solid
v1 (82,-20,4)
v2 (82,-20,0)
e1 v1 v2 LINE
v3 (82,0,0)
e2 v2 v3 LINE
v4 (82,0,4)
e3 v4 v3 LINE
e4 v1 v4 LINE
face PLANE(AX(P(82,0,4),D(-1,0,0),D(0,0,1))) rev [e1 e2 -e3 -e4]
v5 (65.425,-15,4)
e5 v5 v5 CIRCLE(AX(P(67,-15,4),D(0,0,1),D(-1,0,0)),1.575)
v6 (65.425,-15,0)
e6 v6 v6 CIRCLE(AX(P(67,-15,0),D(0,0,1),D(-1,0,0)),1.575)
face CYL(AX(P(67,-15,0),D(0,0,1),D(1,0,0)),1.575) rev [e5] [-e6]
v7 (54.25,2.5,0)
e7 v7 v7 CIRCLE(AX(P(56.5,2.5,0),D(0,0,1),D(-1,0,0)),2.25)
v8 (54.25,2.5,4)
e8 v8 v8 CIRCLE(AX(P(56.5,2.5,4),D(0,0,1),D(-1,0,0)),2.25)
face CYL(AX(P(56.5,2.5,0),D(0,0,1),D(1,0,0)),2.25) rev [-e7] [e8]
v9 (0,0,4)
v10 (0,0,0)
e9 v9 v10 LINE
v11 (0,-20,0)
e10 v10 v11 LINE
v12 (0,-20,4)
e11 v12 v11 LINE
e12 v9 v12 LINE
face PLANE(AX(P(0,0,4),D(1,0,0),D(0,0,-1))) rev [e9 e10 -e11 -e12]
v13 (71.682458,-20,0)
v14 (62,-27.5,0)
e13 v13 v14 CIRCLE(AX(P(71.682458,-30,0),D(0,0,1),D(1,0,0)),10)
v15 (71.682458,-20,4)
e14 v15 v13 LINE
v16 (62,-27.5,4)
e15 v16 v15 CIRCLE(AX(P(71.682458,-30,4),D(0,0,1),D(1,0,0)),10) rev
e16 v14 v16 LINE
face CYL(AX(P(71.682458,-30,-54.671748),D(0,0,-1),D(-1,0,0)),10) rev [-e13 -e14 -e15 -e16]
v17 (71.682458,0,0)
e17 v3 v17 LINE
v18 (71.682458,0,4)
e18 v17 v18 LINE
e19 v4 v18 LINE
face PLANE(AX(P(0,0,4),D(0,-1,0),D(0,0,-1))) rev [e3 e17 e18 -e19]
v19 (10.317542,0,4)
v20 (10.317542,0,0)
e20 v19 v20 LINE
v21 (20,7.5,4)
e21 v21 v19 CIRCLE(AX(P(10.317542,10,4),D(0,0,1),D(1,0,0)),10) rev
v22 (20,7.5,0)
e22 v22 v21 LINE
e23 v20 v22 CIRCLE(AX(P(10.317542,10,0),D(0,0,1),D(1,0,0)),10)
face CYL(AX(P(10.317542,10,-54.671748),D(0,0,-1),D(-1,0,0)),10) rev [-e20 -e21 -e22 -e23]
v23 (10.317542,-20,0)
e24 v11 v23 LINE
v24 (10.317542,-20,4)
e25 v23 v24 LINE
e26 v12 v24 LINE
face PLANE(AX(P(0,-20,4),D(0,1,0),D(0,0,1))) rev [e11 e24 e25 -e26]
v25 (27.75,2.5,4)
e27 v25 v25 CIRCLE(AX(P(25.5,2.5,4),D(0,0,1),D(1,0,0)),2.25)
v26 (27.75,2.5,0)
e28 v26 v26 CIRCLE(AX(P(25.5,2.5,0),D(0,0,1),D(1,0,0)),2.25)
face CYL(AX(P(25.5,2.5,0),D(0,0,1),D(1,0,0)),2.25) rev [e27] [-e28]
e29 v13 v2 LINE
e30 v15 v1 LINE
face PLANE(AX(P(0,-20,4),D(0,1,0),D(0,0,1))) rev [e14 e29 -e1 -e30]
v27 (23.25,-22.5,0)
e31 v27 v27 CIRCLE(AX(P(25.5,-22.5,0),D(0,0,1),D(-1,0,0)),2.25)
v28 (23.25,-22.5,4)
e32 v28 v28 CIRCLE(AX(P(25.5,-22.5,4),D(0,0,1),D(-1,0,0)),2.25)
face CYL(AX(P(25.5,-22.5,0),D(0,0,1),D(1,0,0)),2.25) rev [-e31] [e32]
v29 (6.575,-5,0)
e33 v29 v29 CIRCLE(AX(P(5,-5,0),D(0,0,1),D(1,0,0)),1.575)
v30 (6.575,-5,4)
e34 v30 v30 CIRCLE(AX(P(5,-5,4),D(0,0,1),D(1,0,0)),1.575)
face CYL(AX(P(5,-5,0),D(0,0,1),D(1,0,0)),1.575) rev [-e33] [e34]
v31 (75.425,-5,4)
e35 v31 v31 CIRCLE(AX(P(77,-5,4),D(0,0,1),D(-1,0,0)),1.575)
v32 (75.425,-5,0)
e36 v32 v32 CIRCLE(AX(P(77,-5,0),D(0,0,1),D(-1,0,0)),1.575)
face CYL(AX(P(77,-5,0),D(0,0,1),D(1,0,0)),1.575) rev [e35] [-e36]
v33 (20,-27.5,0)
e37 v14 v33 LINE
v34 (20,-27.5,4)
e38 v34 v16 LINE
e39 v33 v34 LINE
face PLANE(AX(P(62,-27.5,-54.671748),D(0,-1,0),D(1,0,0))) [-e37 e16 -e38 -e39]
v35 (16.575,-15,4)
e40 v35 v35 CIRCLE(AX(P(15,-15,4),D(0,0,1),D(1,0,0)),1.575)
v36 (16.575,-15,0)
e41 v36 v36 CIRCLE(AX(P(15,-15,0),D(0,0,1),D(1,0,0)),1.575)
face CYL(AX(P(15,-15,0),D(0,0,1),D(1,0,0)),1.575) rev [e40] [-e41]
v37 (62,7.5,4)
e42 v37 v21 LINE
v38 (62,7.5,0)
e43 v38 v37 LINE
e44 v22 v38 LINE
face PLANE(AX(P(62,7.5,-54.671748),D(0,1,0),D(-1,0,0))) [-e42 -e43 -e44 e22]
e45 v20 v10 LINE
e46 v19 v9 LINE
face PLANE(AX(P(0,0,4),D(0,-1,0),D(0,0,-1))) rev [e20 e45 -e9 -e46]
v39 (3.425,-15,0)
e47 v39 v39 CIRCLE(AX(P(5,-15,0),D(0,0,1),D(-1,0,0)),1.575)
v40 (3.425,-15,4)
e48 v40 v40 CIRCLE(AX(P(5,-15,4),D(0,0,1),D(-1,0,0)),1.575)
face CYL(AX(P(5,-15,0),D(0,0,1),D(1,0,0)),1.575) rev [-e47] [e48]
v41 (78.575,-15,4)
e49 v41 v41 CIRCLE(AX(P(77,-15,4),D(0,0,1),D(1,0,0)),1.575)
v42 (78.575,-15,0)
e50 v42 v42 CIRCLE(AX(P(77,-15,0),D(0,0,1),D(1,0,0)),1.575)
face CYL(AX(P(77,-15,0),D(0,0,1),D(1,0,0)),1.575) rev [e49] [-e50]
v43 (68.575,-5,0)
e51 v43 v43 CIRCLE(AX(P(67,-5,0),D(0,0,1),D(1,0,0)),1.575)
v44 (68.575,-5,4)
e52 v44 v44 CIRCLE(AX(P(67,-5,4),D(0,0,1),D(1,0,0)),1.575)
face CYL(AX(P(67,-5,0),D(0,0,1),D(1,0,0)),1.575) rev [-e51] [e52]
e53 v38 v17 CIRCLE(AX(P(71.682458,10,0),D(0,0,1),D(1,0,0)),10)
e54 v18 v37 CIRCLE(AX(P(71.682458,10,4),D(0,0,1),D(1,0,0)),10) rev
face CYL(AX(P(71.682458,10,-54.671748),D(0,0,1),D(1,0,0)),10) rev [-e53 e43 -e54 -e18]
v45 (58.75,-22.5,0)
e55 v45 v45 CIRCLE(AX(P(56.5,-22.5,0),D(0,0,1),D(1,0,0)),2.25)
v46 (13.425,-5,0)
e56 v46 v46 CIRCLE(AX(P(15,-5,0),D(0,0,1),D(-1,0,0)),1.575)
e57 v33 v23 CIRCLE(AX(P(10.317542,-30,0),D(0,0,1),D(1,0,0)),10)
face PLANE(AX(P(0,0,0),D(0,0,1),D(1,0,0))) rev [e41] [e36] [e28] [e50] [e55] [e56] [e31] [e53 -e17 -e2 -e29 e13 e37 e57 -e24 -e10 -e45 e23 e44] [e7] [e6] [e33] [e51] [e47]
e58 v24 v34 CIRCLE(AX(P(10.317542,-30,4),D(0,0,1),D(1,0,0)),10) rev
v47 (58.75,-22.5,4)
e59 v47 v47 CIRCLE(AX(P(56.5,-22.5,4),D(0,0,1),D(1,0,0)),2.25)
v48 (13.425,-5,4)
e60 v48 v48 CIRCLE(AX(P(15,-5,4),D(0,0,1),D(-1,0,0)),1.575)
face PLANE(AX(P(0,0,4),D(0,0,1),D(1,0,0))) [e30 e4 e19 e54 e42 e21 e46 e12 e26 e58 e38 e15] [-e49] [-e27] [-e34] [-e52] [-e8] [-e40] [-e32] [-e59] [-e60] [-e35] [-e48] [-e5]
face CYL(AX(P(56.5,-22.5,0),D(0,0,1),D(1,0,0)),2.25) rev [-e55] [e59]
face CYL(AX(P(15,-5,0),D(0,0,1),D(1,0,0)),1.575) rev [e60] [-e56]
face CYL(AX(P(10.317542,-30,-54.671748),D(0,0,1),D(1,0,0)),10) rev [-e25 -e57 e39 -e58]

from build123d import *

# Parameters (mm, degrees)
SKETCH_1_W          = 82
SKETCH_1_H          = 20
EXTRUDE_1_DEPTH     = 4
SKETCH_2_W          = 42
SKETCH_2_H          = 35
EXTRUDE_2_DEPTH     = 4
SKETCH_3_R          = 1.575
SKETCH_3_R_2        = 2.25
CUT_EXTRUDE_1_DEPTH = 87.580887036
FILLET_1_R          = 10


with BuildPart() as part:
    # 草图1 → 凸台-拉伸1 (new body)
    with BuildSketch(Plane.XY):
        with Locations((41, -10)):
            Rectangle(SKETCH_1_W, SKETCH_1_H)
    extrude(amount=EXTRUDE_1_DEPTH)

    # 草图2 → 凸台-拉伸2 (add)
    with BuildSketch(Plane.XY.offset(4)):
        with Locations((41, -10)):
            Rectangle(SKETCH_2_W, SKETCH_2_H)
    extrude(amount=-EXTRUDE_2_DEPTH)

    # 草图3 → 切除-拉伸1 (cut, through all)
    with BuildSketch(Plane.XY.offset(4)):
        with Locations((5, -5)):
            Circle(SKETCH_3_R)
        with Locations(Location((15, -5, 0), (0, 0, 180))):
            Circle(SKETCH_3_R)
        with Locations((15, -15)):
            Circle(SKETCH_3_R)
        with Locations(Location((5, -15, 0), (0, 0, 180))):
            Circle(SKETCH_3_R)
        with Locations((77, -15)):
            Circle(SKETCH_3_R)
        with Locations(Location((67, -15, 0), (0, 0, 180))):
            Circle(SKETCH_3_R)
        with Locations((67, -5)):
            Circle(SKETCH_3_R)
        with Locations(Location((77, -5, 0), (0, 0, 180))):
            Circle(SKETCH_3_R)
        with Locations((25.5, 2.5)):
            Circle(SKETCH_3_R_2)
        with Locations(Location((56.5, 2.5, 0), (0, 0, 180))):
            Circle(SKETCH_3_R_2)
        with Locations((56.5, -22.5)):
            Circle(SKETCH_3_R_2)
        with Locations(Location((25.5, -22.5, 0), (0, 0, 180))):
            Circle(SKETCH_3_R_2)
    extrude(amount=-CUT_EXTRUDE_1_DEPTH, mode=Mode.SUBTRACT)

    # 圆角1
    # the kernel refuses this fillet: 10 mm, written as the material it adds along each edge
    with BuildSketch(Plane(origin=(62, -20, 4), x_dir=(0, -1, 0), z_dir=(0, 0, -1)), Plane(origin=(62, 0, 0), x_dir=(0, 1, 0), z_dir=(0, 0, 1))) as fillet_1_piece_1:
        with BuildLine():
            CenterArc((10, -9.682458366), FILLET_1_R, 104.477512186, 75.522487814)
            Line((0, -9.682458366), (-0.2, -9.682458366))
            Line((-0.2, -9.682458366), (-0.2, 0))
            Line((-0.2, 0), (0, 0.2))
            ThreePointArc((0, 0.2), (3.75, 0.2), (7.45, 0.193649167))
            Line((7.45, 0.193649167), (7.5, 0))
        make_face()
    extrude(amount=4)
    with BuildSketch(Plane(origin=(20, -20, 0), x_dir=(-1, 0, 0), z_dir=(0, 0, 1)), Plane(origin=(20, 0, 4), x_dir=(-1, 0, 0), z_dir=(0, 0, -1))) as fillet_1_piece_2:
        with BuildLine():
            CenterArc((9.682458366, 10), FILLET_1_R, 194.477512186, 75.522487814)
            Line((0, 7.5), (-0.193649167, 7.45))
            ThreePointArc((-0.193649167, 7.45), (-0.2, 3.75), (-0.2, 0))
            Line((-0.2, 0), (0, -0.2))
            Line((0, -0.2), (9.682458366, -0.2))
            Line((9.682458366, -0.2), (9.682458366, 0))
        make_face()
    extrude(amount=4)


solid = part.part
